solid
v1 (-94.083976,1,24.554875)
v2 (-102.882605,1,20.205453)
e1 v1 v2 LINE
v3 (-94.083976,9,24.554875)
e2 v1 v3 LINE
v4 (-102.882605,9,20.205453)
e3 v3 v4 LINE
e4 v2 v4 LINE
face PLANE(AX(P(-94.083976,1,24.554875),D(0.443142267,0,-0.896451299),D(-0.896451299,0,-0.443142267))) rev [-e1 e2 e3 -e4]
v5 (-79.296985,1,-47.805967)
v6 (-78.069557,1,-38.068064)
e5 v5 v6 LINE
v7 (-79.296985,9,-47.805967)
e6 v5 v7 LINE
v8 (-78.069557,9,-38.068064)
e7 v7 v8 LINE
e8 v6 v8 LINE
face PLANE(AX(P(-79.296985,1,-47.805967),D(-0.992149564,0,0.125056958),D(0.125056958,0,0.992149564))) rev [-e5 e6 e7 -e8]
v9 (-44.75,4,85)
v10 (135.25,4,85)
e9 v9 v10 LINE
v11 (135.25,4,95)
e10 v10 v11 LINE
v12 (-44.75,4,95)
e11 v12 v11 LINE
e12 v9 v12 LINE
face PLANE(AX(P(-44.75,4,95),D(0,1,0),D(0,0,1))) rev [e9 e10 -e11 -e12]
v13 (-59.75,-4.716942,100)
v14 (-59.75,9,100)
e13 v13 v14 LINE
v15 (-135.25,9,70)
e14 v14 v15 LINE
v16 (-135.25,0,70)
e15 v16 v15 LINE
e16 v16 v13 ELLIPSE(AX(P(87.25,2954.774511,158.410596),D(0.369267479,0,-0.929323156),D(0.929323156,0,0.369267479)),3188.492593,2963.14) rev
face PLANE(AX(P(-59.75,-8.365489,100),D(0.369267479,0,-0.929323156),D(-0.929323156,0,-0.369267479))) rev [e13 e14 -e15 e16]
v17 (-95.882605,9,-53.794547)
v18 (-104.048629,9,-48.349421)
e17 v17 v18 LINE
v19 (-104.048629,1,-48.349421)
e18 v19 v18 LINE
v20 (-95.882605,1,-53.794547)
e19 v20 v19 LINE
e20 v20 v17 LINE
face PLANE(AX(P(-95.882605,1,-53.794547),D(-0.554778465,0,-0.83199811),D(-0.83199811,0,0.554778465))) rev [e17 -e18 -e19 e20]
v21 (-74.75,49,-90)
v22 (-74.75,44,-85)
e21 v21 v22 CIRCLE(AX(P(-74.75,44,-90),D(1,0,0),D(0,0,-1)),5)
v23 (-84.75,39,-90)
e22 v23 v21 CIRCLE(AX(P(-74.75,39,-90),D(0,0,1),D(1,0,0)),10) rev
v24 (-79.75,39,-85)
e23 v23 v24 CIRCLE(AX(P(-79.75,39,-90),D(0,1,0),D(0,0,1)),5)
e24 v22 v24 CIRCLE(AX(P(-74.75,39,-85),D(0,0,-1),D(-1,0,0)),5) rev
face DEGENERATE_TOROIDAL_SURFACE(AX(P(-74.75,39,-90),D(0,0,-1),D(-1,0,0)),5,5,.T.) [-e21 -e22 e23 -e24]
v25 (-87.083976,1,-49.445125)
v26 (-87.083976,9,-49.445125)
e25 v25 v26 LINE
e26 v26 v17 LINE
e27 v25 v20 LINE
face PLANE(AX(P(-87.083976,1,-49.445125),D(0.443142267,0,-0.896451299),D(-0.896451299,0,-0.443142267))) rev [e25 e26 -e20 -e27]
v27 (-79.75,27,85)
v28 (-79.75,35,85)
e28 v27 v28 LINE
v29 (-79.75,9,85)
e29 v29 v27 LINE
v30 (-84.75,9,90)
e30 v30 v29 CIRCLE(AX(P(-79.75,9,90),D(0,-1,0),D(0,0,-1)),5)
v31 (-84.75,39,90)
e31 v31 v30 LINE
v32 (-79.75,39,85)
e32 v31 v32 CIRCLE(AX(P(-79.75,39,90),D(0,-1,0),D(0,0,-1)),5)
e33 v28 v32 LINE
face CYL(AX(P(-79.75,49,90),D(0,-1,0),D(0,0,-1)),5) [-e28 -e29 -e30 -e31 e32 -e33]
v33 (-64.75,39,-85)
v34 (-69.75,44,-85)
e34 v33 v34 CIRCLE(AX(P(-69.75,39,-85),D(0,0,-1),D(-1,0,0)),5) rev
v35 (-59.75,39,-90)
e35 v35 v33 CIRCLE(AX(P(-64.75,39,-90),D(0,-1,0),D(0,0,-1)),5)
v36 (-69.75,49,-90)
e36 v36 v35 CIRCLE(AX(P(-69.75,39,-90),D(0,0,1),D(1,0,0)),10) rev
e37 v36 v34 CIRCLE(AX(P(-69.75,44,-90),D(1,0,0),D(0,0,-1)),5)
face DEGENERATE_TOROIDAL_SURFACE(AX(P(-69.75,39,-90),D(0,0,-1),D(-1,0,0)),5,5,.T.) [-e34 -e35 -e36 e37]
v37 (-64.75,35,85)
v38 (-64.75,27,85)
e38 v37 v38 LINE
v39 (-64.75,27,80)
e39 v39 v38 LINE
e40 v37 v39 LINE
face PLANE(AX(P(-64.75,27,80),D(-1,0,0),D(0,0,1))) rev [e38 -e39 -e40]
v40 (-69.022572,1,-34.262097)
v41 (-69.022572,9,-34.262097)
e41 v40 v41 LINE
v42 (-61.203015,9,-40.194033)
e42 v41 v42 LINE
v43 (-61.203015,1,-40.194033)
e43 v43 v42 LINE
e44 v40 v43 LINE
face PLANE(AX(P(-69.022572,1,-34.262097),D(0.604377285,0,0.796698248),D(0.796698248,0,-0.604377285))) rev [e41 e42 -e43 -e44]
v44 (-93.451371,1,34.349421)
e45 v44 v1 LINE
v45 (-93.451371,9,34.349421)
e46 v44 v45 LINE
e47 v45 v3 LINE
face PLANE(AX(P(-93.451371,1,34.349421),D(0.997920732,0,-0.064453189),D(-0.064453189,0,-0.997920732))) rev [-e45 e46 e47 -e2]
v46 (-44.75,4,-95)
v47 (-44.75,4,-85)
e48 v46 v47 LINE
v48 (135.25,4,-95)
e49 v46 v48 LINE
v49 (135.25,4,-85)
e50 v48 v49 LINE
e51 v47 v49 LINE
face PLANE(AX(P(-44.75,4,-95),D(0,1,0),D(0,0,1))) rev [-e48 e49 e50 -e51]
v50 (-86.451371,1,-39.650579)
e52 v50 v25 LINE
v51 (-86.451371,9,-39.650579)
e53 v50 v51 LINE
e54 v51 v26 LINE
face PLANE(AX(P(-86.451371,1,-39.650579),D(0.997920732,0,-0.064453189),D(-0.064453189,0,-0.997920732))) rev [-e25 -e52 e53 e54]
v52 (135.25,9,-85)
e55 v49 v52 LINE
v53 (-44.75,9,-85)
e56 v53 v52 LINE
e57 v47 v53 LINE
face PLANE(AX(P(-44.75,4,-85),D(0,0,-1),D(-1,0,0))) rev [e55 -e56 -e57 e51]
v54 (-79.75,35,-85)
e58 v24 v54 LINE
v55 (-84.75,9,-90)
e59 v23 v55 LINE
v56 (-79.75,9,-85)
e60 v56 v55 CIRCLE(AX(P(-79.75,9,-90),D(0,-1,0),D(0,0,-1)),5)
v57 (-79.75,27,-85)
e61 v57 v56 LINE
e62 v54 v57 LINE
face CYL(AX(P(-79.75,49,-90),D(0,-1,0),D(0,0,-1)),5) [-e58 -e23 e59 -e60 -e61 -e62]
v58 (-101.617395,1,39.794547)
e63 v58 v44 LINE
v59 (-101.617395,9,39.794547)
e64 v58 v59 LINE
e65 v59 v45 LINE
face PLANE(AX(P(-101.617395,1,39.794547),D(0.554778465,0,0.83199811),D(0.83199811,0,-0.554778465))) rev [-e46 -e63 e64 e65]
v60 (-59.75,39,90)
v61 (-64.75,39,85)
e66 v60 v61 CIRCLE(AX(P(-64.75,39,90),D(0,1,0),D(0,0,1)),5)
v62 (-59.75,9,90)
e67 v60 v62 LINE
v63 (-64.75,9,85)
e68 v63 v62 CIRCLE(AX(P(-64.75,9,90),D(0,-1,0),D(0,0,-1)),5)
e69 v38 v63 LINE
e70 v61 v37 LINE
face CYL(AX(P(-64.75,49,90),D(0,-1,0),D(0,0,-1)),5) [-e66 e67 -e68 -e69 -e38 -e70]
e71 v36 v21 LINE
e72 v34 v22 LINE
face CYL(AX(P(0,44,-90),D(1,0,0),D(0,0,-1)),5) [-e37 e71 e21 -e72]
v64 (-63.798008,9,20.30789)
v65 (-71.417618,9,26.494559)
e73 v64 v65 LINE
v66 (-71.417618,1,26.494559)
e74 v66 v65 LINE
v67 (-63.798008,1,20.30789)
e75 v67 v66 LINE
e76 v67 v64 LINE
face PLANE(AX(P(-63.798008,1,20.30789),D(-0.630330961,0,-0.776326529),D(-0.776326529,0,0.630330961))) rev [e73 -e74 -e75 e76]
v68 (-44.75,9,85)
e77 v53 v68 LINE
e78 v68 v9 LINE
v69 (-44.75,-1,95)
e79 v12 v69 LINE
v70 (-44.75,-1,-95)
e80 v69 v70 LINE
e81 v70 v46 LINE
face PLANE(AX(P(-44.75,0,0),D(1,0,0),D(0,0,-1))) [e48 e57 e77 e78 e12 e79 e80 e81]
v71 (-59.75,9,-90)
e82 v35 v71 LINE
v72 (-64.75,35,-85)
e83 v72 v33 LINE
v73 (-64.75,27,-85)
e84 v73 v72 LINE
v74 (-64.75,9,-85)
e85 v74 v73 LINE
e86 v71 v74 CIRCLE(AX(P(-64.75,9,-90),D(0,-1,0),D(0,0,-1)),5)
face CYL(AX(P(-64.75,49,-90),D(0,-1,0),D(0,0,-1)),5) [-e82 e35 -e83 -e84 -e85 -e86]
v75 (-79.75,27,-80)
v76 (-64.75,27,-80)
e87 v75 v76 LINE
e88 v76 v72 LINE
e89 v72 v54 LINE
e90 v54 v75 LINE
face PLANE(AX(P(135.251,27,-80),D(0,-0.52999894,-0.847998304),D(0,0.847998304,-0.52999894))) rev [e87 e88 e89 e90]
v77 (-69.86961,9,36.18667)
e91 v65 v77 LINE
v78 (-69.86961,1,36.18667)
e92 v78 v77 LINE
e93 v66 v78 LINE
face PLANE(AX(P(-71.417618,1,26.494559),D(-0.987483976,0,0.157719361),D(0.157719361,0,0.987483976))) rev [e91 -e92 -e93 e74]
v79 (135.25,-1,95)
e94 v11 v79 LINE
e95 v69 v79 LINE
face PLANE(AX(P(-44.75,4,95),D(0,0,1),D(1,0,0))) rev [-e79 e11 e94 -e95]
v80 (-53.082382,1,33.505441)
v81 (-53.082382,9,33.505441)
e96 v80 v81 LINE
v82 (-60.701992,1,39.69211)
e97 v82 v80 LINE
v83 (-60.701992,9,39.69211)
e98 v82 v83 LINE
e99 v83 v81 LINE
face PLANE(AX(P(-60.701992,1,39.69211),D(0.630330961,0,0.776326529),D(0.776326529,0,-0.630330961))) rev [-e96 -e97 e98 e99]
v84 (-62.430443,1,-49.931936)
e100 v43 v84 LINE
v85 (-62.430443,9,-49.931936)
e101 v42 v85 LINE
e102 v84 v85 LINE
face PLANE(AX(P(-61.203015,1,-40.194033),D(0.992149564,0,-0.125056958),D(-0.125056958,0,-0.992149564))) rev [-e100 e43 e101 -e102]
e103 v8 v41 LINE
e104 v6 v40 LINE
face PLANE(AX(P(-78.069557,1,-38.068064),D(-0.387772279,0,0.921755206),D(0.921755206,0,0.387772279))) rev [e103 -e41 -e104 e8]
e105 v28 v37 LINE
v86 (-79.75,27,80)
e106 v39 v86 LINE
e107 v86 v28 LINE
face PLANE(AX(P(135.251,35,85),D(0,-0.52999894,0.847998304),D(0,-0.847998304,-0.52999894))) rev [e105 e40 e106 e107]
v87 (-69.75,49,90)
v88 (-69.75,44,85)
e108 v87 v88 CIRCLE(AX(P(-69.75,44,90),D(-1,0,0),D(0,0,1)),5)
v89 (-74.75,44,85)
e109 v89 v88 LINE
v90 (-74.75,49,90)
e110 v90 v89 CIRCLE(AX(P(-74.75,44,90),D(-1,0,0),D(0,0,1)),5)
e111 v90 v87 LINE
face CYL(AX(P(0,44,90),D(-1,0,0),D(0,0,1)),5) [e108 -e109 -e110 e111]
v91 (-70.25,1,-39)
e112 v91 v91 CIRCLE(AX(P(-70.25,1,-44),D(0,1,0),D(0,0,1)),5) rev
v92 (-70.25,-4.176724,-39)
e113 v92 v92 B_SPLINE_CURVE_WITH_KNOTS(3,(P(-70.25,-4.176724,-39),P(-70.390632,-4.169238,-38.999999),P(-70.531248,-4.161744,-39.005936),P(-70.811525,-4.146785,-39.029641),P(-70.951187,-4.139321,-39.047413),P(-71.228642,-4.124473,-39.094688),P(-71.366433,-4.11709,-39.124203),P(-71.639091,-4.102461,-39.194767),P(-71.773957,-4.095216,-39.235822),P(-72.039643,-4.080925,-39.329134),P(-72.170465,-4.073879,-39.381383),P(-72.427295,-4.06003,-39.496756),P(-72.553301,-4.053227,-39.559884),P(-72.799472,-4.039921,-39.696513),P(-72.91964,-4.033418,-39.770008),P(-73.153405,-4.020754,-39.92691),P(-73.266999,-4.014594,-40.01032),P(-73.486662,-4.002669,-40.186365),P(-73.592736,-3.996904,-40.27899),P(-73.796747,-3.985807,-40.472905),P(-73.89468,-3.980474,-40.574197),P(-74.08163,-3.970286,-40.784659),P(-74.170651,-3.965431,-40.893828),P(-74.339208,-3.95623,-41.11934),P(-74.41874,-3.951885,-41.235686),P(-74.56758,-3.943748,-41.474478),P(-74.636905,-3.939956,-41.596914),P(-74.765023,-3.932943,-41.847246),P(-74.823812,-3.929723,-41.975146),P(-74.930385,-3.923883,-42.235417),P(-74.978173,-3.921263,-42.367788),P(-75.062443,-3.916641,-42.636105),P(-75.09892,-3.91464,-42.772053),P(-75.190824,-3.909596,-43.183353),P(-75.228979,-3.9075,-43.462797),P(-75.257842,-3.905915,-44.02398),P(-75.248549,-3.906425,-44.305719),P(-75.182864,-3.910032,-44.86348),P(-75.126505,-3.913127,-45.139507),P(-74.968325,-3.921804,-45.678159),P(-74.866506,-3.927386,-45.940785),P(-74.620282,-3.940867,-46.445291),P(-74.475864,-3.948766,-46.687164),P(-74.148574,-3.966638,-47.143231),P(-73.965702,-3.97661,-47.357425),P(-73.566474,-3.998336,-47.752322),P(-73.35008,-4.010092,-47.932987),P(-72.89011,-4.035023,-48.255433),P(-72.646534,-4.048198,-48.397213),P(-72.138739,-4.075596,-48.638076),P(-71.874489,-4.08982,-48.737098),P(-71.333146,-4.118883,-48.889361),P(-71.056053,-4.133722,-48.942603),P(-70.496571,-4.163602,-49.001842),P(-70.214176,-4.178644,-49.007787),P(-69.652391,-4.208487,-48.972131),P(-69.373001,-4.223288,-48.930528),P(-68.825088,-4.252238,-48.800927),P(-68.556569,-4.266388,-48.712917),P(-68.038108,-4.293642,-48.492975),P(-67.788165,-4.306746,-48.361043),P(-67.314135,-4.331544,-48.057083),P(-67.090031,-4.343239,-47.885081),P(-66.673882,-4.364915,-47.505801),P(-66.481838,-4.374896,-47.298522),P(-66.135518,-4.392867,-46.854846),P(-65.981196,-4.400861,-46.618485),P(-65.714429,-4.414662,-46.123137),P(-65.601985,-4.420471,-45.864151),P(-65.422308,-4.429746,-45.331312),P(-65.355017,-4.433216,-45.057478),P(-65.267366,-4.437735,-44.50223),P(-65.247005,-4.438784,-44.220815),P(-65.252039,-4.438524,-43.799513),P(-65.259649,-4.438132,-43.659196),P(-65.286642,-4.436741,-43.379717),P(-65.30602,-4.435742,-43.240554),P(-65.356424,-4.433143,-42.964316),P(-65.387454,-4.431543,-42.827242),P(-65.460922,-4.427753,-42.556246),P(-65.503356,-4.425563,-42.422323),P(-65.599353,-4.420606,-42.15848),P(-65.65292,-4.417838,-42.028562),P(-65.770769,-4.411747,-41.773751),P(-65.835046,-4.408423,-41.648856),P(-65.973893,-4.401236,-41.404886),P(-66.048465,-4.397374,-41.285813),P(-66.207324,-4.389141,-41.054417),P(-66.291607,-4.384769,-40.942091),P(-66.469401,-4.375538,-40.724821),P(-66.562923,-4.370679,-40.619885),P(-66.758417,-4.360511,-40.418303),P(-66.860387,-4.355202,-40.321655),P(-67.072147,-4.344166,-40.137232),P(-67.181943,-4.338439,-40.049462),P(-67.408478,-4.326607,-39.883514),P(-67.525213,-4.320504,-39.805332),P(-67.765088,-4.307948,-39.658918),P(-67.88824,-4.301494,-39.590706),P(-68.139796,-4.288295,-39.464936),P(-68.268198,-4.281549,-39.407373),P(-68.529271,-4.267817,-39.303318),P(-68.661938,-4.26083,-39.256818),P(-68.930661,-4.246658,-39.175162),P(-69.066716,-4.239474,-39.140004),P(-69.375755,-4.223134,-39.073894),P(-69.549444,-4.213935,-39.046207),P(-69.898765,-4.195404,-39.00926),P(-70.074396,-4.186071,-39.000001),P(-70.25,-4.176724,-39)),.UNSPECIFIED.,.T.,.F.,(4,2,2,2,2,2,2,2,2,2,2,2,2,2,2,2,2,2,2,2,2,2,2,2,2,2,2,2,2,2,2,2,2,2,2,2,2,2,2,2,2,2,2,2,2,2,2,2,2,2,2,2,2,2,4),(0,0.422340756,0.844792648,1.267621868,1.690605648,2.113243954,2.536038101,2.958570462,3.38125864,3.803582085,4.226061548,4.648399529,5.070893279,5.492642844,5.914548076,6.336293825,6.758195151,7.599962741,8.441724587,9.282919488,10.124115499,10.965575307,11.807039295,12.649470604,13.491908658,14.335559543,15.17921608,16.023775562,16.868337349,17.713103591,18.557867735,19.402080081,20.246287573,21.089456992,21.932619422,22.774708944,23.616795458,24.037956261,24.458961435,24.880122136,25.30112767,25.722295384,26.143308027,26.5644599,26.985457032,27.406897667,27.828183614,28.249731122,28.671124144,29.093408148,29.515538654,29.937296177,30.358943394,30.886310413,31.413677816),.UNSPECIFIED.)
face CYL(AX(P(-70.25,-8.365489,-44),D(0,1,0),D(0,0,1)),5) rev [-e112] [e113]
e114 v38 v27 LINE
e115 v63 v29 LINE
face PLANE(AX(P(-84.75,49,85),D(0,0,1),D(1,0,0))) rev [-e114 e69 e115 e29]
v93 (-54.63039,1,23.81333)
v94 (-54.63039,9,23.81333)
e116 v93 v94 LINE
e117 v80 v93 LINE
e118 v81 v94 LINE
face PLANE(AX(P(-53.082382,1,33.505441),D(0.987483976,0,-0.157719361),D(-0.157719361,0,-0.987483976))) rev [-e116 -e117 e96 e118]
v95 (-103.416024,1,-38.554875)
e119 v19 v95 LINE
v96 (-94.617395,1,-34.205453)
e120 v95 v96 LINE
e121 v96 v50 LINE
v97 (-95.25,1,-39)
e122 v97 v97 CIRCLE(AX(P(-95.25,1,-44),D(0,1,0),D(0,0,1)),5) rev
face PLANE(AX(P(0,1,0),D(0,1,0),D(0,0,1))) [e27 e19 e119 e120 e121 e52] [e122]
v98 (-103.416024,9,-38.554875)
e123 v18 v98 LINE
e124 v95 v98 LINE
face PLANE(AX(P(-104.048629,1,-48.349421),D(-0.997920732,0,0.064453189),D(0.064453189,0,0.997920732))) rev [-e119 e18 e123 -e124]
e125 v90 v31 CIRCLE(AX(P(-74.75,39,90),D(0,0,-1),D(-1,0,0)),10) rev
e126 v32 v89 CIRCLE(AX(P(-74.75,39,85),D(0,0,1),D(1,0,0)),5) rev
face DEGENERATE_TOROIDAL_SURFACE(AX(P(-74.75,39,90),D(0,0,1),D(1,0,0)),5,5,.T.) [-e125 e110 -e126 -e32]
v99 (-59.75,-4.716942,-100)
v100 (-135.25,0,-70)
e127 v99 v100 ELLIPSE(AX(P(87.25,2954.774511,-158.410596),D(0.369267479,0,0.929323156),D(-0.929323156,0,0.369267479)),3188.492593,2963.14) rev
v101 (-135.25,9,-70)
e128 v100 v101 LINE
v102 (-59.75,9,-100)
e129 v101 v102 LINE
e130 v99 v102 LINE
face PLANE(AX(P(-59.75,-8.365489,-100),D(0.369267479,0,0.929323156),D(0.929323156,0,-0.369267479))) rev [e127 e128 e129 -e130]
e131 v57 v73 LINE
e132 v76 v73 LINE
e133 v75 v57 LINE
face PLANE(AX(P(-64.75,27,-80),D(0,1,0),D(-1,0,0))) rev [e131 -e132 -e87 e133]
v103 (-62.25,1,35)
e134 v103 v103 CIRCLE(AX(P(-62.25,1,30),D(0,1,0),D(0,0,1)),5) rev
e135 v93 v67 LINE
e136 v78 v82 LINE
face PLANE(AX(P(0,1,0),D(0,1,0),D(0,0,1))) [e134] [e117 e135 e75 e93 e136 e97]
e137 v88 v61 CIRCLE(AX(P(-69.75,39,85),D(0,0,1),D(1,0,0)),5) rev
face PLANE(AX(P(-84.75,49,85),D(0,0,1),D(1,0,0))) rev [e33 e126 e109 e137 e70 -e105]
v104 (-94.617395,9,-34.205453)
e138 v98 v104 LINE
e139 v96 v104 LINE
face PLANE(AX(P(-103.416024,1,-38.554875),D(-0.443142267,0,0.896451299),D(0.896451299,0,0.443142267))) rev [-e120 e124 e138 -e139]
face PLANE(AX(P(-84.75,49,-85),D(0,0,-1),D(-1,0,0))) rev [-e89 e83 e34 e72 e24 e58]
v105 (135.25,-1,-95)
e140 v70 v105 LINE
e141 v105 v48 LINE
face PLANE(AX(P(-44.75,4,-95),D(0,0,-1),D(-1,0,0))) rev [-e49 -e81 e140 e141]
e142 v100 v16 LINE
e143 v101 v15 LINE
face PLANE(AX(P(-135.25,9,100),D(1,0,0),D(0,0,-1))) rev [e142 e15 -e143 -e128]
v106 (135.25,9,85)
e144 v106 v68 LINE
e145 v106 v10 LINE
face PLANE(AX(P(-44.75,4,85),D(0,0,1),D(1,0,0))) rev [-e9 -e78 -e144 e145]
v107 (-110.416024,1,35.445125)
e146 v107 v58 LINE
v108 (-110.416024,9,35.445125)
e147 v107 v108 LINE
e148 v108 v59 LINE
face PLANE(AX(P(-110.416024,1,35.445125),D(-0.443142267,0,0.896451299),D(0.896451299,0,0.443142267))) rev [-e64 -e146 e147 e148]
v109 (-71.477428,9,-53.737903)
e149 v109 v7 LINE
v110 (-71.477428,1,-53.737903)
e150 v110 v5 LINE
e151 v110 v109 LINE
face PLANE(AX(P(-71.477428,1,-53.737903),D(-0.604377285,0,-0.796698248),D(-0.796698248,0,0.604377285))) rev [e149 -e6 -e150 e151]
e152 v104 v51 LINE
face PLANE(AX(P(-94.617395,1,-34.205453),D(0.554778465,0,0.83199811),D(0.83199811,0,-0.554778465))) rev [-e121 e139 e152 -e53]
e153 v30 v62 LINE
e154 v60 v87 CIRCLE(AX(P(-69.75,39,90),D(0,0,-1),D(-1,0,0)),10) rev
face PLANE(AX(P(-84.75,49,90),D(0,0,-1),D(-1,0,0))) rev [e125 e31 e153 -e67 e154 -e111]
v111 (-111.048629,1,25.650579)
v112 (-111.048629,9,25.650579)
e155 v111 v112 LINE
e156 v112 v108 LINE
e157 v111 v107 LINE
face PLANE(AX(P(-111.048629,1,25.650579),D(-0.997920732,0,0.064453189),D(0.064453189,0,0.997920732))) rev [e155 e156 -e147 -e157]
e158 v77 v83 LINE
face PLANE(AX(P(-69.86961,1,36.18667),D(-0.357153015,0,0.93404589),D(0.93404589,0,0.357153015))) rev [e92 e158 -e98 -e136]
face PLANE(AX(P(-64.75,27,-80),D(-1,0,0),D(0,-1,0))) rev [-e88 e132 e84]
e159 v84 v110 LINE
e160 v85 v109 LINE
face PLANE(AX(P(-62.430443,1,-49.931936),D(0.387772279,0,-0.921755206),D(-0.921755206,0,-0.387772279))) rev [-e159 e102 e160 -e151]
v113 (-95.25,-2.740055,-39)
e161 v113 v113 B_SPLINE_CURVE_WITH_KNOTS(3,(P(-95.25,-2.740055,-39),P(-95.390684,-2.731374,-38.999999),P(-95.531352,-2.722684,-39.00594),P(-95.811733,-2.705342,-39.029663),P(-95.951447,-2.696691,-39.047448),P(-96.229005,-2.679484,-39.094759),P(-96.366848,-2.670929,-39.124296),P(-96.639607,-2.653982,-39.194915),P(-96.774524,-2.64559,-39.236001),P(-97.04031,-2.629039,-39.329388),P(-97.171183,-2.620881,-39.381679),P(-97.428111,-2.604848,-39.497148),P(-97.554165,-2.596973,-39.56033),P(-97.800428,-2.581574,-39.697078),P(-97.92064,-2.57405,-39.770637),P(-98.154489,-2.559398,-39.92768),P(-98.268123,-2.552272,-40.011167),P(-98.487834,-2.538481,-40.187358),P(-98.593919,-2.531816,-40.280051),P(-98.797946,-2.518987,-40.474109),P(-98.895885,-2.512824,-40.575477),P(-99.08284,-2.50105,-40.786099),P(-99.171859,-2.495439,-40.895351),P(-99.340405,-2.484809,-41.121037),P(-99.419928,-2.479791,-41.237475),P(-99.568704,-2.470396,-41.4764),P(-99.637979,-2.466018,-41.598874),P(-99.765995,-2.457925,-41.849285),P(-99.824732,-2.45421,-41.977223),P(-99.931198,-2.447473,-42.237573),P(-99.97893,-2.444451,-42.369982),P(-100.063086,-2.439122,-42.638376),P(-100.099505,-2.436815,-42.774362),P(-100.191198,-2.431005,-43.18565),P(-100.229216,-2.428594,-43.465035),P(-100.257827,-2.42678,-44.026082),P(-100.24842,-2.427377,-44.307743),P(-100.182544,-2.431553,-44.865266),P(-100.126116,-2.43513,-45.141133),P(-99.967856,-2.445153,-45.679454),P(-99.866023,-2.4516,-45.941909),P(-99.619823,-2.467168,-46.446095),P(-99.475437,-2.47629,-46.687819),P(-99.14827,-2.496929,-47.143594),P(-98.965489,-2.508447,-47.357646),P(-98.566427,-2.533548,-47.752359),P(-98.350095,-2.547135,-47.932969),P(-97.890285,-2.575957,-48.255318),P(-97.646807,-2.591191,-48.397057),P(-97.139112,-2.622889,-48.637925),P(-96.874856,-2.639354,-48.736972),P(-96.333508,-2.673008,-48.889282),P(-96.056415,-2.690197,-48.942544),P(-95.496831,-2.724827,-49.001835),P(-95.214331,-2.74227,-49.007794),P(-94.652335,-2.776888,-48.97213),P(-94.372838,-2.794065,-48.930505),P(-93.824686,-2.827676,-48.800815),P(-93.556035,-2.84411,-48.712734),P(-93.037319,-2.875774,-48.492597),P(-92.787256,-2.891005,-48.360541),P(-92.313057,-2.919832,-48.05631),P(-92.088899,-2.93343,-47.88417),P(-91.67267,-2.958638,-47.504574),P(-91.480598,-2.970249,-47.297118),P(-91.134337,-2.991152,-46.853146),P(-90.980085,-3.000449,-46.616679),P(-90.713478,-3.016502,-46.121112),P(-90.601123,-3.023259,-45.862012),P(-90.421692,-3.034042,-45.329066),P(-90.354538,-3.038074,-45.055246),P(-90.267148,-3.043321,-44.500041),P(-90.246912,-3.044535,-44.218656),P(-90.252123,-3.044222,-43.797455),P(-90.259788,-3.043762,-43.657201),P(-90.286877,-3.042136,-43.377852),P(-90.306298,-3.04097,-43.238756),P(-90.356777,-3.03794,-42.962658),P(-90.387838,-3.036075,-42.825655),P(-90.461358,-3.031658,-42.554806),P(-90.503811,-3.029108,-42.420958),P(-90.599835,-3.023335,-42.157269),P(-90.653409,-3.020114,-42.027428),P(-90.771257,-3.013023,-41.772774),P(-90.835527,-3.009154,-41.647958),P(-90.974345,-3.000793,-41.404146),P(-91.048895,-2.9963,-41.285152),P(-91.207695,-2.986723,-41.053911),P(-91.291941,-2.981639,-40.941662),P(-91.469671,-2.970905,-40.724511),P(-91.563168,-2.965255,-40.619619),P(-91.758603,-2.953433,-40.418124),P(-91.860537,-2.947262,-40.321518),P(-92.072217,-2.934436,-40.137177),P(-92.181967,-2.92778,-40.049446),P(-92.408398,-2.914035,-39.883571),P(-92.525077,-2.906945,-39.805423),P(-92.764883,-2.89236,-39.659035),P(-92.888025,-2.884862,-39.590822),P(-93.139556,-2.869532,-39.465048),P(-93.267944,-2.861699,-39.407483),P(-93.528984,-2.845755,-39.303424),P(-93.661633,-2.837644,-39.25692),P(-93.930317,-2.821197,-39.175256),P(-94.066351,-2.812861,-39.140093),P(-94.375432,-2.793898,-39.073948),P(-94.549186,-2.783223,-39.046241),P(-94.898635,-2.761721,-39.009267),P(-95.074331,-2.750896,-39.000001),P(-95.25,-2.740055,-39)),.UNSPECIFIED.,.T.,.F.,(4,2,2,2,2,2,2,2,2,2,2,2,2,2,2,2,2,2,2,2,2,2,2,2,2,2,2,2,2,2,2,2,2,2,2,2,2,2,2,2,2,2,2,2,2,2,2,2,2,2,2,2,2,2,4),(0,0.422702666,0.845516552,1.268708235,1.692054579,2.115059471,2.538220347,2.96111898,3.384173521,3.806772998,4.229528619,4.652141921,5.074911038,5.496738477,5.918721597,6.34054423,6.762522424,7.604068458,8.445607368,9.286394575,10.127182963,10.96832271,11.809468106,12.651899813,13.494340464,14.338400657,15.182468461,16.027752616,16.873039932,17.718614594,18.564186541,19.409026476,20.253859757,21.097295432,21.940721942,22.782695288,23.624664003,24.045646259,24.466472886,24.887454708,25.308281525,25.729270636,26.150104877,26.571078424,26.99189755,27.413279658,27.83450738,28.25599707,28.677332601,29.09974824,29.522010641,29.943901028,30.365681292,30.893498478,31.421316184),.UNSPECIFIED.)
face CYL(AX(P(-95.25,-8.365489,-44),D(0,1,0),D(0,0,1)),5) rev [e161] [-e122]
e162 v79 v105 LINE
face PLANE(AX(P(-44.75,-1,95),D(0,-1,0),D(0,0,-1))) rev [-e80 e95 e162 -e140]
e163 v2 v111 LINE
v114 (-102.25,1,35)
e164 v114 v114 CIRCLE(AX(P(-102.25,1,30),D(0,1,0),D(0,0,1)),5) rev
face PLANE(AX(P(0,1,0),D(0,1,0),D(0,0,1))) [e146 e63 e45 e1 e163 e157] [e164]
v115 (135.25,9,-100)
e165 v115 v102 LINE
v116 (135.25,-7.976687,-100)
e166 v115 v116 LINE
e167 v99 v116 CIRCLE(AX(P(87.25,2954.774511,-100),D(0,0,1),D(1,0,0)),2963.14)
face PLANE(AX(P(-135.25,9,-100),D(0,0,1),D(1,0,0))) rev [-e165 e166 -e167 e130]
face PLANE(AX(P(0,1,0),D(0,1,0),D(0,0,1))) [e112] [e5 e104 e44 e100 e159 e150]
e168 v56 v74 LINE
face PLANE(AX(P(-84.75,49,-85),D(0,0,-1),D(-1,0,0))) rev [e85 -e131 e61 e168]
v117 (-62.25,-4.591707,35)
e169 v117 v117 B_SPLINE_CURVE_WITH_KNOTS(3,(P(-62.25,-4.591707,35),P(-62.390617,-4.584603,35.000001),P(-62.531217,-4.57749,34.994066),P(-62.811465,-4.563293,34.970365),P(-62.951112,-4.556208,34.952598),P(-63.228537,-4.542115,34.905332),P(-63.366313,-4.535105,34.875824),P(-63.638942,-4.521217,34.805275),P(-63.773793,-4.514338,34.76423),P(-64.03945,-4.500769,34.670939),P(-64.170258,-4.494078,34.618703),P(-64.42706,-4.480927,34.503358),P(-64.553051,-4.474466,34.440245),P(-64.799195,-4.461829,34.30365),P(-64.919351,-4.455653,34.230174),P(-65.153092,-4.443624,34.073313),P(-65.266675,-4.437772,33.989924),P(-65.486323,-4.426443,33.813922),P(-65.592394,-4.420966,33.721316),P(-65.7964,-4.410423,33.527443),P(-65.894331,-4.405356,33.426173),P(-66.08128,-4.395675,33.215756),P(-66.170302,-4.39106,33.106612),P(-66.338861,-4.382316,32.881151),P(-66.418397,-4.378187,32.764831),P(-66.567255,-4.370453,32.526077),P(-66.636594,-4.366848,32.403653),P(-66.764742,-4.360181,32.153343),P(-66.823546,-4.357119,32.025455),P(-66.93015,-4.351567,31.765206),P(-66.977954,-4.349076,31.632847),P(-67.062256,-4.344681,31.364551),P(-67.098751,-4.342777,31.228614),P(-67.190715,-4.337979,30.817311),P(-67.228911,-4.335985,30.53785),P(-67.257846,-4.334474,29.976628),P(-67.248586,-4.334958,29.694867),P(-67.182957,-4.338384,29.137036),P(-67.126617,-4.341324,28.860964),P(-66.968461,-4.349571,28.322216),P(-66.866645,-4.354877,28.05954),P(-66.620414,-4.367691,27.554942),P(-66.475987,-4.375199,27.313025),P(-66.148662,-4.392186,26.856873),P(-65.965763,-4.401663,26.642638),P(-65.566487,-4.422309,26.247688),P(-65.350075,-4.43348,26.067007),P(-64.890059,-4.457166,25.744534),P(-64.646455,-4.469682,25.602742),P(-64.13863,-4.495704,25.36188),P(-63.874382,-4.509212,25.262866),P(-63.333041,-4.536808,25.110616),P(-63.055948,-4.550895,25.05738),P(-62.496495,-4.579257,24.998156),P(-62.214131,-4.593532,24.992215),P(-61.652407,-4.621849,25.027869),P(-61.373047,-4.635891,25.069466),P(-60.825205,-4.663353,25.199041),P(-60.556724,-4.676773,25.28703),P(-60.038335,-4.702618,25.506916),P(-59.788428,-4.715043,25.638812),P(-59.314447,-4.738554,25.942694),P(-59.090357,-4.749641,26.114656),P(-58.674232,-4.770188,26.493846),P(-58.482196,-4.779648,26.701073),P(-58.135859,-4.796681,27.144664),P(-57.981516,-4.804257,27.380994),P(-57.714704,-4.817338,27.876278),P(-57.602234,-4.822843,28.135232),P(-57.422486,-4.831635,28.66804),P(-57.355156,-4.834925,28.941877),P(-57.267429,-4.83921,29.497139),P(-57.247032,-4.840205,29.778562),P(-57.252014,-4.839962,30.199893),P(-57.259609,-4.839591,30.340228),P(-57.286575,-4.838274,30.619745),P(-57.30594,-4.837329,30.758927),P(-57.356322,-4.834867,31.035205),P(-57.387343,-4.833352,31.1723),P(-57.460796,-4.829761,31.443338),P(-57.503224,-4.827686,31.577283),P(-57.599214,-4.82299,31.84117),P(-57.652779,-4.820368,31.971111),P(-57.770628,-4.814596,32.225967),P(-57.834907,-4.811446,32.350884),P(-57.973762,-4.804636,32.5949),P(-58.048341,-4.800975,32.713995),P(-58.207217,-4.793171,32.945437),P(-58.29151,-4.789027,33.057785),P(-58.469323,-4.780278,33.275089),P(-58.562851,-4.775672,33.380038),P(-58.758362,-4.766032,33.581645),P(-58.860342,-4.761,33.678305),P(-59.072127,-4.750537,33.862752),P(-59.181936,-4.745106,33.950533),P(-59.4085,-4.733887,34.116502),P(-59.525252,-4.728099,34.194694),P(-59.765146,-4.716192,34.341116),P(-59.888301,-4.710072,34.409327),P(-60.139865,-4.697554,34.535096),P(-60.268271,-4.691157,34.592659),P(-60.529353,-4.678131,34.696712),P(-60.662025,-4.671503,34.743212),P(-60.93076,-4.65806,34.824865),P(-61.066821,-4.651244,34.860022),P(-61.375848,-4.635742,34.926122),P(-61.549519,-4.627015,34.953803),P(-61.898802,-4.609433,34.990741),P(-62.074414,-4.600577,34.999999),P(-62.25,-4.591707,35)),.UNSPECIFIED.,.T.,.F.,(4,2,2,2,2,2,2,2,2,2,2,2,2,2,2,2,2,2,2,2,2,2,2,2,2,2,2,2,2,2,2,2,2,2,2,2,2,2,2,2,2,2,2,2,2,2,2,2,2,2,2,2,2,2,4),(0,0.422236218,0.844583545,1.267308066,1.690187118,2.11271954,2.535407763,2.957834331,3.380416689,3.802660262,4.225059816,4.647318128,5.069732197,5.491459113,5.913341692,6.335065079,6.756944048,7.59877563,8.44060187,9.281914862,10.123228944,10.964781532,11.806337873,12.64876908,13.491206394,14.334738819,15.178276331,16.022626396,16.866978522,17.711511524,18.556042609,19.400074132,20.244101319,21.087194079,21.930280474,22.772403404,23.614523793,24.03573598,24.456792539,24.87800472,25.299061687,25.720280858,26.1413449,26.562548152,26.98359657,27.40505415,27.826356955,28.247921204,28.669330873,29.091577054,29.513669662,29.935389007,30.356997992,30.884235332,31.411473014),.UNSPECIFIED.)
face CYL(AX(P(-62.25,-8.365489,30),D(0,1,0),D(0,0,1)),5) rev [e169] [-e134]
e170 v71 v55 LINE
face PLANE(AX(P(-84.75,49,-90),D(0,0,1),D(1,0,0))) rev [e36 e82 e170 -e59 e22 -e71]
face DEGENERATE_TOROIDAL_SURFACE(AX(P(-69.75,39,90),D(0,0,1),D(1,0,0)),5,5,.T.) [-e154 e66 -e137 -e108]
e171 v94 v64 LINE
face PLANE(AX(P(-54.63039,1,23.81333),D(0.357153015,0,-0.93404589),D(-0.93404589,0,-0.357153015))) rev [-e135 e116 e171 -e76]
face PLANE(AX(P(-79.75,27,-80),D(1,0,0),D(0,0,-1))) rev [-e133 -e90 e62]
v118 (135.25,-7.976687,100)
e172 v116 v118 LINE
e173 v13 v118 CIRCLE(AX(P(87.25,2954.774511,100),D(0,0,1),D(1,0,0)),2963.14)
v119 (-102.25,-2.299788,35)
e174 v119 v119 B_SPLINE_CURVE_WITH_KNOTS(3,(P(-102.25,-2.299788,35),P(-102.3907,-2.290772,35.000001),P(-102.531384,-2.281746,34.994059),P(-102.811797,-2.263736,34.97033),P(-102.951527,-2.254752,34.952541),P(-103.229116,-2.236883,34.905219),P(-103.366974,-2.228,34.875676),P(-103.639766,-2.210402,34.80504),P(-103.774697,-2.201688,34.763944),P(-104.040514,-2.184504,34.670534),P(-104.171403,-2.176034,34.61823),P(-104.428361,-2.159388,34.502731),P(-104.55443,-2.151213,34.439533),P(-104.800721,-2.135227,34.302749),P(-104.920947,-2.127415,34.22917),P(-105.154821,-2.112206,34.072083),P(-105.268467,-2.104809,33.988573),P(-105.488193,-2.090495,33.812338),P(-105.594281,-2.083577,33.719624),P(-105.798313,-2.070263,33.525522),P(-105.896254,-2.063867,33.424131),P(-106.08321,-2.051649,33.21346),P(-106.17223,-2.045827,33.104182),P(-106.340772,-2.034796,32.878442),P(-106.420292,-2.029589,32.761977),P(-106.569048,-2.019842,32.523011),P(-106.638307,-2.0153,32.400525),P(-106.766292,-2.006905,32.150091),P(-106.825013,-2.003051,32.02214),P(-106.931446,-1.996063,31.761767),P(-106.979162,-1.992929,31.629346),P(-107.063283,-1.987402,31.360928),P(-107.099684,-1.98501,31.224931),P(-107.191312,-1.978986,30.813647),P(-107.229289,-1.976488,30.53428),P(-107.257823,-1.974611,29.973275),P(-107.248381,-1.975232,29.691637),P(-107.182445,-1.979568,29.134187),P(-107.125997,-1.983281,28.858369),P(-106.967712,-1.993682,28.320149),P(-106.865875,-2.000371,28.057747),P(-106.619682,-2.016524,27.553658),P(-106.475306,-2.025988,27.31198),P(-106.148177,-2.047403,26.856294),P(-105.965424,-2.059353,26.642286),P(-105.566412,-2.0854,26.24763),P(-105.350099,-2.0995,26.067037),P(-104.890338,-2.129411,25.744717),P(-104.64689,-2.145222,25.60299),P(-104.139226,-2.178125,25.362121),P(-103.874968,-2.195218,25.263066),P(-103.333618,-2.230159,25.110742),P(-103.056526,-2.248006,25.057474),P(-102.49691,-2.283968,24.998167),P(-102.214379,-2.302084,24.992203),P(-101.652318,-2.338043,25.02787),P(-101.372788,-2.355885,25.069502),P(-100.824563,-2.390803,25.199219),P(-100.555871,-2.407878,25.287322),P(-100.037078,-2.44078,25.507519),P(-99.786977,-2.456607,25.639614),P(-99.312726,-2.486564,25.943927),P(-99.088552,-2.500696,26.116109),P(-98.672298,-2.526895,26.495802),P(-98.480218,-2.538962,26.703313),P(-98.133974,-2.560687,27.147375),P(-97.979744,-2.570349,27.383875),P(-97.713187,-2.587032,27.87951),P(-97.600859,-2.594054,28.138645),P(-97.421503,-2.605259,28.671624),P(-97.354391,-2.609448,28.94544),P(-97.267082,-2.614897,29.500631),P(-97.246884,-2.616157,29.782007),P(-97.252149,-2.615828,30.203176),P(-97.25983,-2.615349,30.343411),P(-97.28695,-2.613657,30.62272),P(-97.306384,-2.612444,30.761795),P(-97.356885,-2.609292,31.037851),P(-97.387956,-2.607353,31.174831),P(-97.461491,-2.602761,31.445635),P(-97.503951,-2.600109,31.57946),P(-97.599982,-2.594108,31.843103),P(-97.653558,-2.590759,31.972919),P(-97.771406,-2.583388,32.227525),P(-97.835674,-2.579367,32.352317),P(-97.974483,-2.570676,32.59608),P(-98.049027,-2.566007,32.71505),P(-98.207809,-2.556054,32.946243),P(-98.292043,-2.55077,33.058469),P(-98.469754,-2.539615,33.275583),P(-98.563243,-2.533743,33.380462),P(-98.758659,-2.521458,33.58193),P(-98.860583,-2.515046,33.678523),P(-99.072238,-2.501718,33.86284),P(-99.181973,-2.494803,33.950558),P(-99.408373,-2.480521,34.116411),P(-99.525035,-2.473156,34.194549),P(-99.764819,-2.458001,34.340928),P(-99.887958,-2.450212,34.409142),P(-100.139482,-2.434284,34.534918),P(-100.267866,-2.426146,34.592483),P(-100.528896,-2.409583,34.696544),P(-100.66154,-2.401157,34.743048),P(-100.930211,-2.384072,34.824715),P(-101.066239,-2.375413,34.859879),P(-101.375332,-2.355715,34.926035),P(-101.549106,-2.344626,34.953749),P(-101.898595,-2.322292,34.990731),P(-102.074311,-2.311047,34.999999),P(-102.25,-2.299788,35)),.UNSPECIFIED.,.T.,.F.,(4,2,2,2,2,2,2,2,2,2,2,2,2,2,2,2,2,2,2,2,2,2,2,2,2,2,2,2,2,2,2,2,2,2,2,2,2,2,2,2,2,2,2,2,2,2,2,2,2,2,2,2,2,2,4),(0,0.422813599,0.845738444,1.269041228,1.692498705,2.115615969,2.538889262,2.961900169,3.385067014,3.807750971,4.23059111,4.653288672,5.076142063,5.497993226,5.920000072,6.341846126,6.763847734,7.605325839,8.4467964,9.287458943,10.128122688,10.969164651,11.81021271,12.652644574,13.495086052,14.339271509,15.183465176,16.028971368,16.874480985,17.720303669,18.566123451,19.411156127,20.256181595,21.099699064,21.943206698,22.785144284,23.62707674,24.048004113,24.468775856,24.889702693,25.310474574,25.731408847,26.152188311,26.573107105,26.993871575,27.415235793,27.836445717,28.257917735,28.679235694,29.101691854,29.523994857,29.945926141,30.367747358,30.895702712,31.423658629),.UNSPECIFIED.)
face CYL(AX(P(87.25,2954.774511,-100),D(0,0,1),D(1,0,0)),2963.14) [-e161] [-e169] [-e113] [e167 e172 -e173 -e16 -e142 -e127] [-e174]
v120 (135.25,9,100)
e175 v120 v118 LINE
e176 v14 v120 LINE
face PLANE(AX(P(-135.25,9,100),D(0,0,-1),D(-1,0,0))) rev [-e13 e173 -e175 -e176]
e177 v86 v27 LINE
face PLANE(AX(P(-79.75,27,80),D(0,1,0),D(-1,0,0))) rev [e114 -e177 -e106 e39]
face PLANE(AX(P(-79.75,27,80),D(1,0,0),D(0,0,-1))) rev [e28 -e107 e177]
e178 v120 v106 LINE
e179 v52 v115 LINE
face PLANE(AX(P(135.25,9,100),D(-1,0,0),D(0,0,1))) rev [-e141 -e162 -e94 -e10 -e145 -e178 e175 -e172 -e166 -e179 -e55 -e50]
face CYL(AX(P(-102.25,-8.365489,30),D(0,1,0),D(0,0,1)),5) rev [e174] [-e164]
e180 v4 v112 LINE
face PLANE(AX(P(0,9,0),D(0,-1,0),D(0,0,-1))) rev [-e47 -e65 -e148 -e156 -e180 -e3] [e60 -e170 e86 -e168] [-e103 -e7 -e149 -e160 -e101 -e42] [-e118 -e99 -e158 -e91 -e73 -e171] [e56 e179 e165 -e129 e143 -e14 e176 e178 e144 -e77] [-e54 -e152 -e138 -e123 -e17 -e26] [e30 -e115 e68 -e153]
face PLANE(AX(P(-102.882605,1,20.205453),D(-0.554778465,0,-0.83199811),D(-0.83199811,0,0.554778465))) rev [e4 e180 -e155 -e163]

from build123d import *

# Parameters (mm, degrees)
SKETCH1_W                = 270.5
SKETCH1_H                = 200
MAINBODY_DEPTH           = 9
MAINBODYCURVE_DEPTH      = 100
MAINBODYCURVE_DEPTH_BACK = 100
BOLTHOLE_DEPTH           = 170.097967804
BOLTHOLE_DEPTH_BACK      = 170.097967804
SKETCH5_R                = 5
BOLTHEXHOLE_DEPTH        = 8
SLIDECUT_DEPTH           = 180
SKETCH18_W               = 25
SKETCH18_H               = 5
TABS_DEPTH               = 40
SKETCH19_W               = 15
SKETCH19_H               = 8
TABTRIANGLE1_DEPTH       = 5
TABTRIANGLECUT1_REACH    = 244.128
FILLET1_R                = 10
FILLET2_R                = 5
SKETCH21_W               = 15
SKETCH21_H               = 8
TABTRIANGLE2_DEPTH       = 5
TABTRIANGLECUT2_REACH    = 244.128
FILLET3_R                = 10
FILLET4_R                = 5
CUT_EXTRUDE15_DEPTH      = 173.89465737


with BuildPart() as part:
    # Sketch1 → MainBody (new body)
    with BuildSketch(Plane(origin=(0, 0, 0), x_dir=(1, 0, 0), z_dir=(0, 1, 0))):
        Rectangle(SKETCH1_W, SKETCH1_H)
    extrude(amount=MAINBODY_DEPTH)

    # Sketch12 → MainBodyCurve (add, two sides: drawn at the far end of the back side and taken through both)
    with BuildSketch(Plane.XY.offset(-MAINBODYCURVE_DEPTH_BACK)):
        with BuildLine():
            Line((135.25, 0), (135.25, -7.976686934))
            ThreePointArc((135.25, -7.976686934), (-0.091109356, -7.0779822), (-135.25, 0))
            Line((-135.25, 0), (135.25, 0))
        make_face()
    extrude(amount=MAINBODYCURVE_DEPTH + MAINBODYCURVE_DEPTH_BACK)

    # Sketch5 → BoltHole (cut, two sides: drawn at the far end of the back side and taken through both)
    with BuildSketch(Plane(origin=(0, 9, 0), x_dir=(1, 0, 0), z_dir=(0, 1, 0)).offset(-BOLTHOLE_DEPTH_BACK)):
        with Locations(Location((-102.25, -30, 0), (0, 0, 270))):
            Circle(SKETCH5_R)
        with Locations(Location((-95.25, 44, 0), (0, 0, 270))):
            Circle(SKETCH5_R)
        with Locations(Location((-70.25, 44, 0), (0, 0, 270))):
            Circle(SKETCH5_R)
        with Locations(Location((-62.25, -30, 0), (0, 0, 270))):
            Circle(SKETCH5_R)
    extrude(amount=BOLTHOLE_DEPTH + BOLTHOLE_DEPTH_BACK, mode=Mode.SUBTRACT)

    # Sketch13 → BoltHexHole (cut)
    with BuildSketch(Plane(origin=(0, 9, 0), x_dir=(1, 0, 0), z_dir=(0, 1, 0))):
        Polygon((-87.083976342, 49.445125431), (-95.882605121, 53.794546651), (-104.048628779, 48.34942122), (-103.416023658, 38.554874569), (-94.617394879, 34.205453349), (-86.451371221, 39.65057878), align=None)
        Polygon((-62.430442888, 49.931935595), (-71.477428362, 53.737902903), (-79.296985475, 47.805967308), (-78.069557112, 38.068064405), (-69.022571638, 34.262097097), (-61.203014525, 40.194032692), align=None)
        Polygon((-94.083976342, -24.554874569), (-102.882605121, -20.205453349), (-111.048628779, -25.65057878), (-110.416023658, -35.445125431), (-101.617394879, -39.794546651), (-93.451371221, -34.34942122), align=None)
        Polygon((-54.630390383, -23.813330248), (-63.798008362, -20.307889629), (-71.417617978, -26.494559381), (-69.869609617, -36.186669752), (-60.701991638, -39.692110371), (-53.082382022, -33.505440619), align=None)
    extrude(amount=-BOLTHEXHOLE_DEPTH, mode=Mode.SUBTRACT)

    # Sketch15 → SlideCut (cut)
    with BuildSketch(Plane(origin=(135.25, 0, 0), x_dir=(0, 0, -1), z_dir=(1, 0, 0))):
        Polygon((-85, 14), (85, 14), (85, 4), (95, 4), (95, -1), (-95, -1), (-95, 4), (-85, 4), align=None)
    extrude(amount=-SLIDECUT_DEPTH, mode=Mode.SUBTRACT)

    # Sketch18 → Tabs (add)
    with BuildSketch(Plane(origin=(0, 9, 0), x_dir=(1, 0, 0), z_dir=(0, 1, 0))):
        with Locations((-72.25, -87.5)):
            Rectangle(SKETCH18_W, SKETCH18_H)
        with Locations((-72.25, 87.5)):
            Rectangle(SKETCH18_W, SKETCH18_H)
    extrude(amount=TABS_DEPTH)

    # Sketch19 → TabTriangle1 (add)
    with BuildSketch(Plane(origin=(0, 0, 85), x_dir=(-1, 0, 0), z_dir=(0, 0, -1))):
        with Locations((72.25, 31)):
            Rectangle(SKETCH19_W, SKETCH19_H)
    extrude(amount=TABTRIANGLE1_DEPTH)

    # Sketch20 → TabTriangleCut1 (cut, up to next)
    with BuildSketch(Plane.ZY.offset(79.75), mode=Mode.PRIVATE) as tabtrianglecut1_sk1:
        Polygon((85, 35), (80, 27), (80, 35), align=None)
    tabtrianglecut1_tool1 = extrude(tabtrianglecut1_sk1.sketch, amount=-TABTRIANGLECUT1_REACH, mode=Mode.PRIVATE) & part.part
    add(tabtrianglecut1_tool1.solids().sort_by_distance((-79.75, 32.333333, 81.666667))[0], mode=Mode.SUBTRACT)

    # Fillet1
    fillet1_edges = [part.edges().sort_by_distance(p)[0] for p in [
        (-84.75, 49, 87.5),
        (-59.75, 49, 87.5),
    ]]
    fillet(fillet1_edges, radius=FILLET1_R)

    # Fillet2
    fillet2_edges = [part.edges().sort_by_distance(p)[0] for p in [
        (-84.75, 24, 85),
        (-59.75, 24, 85),
        (-62.678932188, 46.071067812, 85),
        (-72.25, 49, 85),
        (-81.821067812, 46.071067812, 85),
    ]]
    fillet(fillet2_edges, radius=FILLET2_R - 0.0001)  # a hair under: the kernel refuses the full size

    # Sketch21 → TabTriangle2 (add)
    with BuildSketch(Plane.XY.offset(-85)):
        with Locations((-72.25, 31)):
            Rectangle(SKETCH21_W, SKETCH21_H)
    extrude(amount=TABTRIANGLE2_DEPTH)

    # Sketch22 → TabTriangleCut2 (cut, up to next)
    with BuildSketch(Plane.ZY.offset(79.75), mode=Mode.PRIVATE) as tabtrianglecut2_sk1:
        Polygon((-80, 27), (-85, 35), (-80, 35), align=None)
    tabtrianglecut2_tool1 = extrude(tabtrianglecut2_sk1.sketch, amount=-TABTRIANGLECUT2_REACH, mode=Mode.PRIVATE) & part.part
    add(tabtrianglecut2_tool1.solids().sort_by_distance((-79.75, 32.333333, -81.666667))[0], mode=Mode.SUBTRACT)

    # Fillet3
    fillet3_edges = [part.edges().sort_by_distance(p)[0] for p in [
        (-84.75, 49, -87.5),
        (-59.75, 49, -87.5),
    ]]
    fillet(fillet3_edges, radius=FILLET3_R)

    # Fillet4
    fillet4_edges = [part.edges().sort_by_distance(p)[0] for p in [
        (-59.75, 24, -85),
        (-62.678932188, 46.071067812, -85),
        (-72.25, 49, -85),
        (-84.75, 24, -85),
        (-81.821067812, 46.071067812, -85),
    ]]
    fillet(fillet4_edges, radius=FILLET4_R - 0.0001)  # a hair under: the kernel refuses the full size

    # Sketch27 → Cut-Extrude15 (cut, through all)
    with BuildSketch(Plane(origin=(0, 9, 0), x_dir=(1, 0, 0), z_dir=(0, 1, 0))):
        Polygon((-59.75, 100), (-135.25, 70), (-135.25, 100), align=None)
        Polygon((-59.75, -100), (-135.25, -70), (-135.25, -100), align=None)
    extrude(amount=-CUT_EXTRUDE15_DEPTH, mode=Mode.SUBTRACT)


solid = part.part
